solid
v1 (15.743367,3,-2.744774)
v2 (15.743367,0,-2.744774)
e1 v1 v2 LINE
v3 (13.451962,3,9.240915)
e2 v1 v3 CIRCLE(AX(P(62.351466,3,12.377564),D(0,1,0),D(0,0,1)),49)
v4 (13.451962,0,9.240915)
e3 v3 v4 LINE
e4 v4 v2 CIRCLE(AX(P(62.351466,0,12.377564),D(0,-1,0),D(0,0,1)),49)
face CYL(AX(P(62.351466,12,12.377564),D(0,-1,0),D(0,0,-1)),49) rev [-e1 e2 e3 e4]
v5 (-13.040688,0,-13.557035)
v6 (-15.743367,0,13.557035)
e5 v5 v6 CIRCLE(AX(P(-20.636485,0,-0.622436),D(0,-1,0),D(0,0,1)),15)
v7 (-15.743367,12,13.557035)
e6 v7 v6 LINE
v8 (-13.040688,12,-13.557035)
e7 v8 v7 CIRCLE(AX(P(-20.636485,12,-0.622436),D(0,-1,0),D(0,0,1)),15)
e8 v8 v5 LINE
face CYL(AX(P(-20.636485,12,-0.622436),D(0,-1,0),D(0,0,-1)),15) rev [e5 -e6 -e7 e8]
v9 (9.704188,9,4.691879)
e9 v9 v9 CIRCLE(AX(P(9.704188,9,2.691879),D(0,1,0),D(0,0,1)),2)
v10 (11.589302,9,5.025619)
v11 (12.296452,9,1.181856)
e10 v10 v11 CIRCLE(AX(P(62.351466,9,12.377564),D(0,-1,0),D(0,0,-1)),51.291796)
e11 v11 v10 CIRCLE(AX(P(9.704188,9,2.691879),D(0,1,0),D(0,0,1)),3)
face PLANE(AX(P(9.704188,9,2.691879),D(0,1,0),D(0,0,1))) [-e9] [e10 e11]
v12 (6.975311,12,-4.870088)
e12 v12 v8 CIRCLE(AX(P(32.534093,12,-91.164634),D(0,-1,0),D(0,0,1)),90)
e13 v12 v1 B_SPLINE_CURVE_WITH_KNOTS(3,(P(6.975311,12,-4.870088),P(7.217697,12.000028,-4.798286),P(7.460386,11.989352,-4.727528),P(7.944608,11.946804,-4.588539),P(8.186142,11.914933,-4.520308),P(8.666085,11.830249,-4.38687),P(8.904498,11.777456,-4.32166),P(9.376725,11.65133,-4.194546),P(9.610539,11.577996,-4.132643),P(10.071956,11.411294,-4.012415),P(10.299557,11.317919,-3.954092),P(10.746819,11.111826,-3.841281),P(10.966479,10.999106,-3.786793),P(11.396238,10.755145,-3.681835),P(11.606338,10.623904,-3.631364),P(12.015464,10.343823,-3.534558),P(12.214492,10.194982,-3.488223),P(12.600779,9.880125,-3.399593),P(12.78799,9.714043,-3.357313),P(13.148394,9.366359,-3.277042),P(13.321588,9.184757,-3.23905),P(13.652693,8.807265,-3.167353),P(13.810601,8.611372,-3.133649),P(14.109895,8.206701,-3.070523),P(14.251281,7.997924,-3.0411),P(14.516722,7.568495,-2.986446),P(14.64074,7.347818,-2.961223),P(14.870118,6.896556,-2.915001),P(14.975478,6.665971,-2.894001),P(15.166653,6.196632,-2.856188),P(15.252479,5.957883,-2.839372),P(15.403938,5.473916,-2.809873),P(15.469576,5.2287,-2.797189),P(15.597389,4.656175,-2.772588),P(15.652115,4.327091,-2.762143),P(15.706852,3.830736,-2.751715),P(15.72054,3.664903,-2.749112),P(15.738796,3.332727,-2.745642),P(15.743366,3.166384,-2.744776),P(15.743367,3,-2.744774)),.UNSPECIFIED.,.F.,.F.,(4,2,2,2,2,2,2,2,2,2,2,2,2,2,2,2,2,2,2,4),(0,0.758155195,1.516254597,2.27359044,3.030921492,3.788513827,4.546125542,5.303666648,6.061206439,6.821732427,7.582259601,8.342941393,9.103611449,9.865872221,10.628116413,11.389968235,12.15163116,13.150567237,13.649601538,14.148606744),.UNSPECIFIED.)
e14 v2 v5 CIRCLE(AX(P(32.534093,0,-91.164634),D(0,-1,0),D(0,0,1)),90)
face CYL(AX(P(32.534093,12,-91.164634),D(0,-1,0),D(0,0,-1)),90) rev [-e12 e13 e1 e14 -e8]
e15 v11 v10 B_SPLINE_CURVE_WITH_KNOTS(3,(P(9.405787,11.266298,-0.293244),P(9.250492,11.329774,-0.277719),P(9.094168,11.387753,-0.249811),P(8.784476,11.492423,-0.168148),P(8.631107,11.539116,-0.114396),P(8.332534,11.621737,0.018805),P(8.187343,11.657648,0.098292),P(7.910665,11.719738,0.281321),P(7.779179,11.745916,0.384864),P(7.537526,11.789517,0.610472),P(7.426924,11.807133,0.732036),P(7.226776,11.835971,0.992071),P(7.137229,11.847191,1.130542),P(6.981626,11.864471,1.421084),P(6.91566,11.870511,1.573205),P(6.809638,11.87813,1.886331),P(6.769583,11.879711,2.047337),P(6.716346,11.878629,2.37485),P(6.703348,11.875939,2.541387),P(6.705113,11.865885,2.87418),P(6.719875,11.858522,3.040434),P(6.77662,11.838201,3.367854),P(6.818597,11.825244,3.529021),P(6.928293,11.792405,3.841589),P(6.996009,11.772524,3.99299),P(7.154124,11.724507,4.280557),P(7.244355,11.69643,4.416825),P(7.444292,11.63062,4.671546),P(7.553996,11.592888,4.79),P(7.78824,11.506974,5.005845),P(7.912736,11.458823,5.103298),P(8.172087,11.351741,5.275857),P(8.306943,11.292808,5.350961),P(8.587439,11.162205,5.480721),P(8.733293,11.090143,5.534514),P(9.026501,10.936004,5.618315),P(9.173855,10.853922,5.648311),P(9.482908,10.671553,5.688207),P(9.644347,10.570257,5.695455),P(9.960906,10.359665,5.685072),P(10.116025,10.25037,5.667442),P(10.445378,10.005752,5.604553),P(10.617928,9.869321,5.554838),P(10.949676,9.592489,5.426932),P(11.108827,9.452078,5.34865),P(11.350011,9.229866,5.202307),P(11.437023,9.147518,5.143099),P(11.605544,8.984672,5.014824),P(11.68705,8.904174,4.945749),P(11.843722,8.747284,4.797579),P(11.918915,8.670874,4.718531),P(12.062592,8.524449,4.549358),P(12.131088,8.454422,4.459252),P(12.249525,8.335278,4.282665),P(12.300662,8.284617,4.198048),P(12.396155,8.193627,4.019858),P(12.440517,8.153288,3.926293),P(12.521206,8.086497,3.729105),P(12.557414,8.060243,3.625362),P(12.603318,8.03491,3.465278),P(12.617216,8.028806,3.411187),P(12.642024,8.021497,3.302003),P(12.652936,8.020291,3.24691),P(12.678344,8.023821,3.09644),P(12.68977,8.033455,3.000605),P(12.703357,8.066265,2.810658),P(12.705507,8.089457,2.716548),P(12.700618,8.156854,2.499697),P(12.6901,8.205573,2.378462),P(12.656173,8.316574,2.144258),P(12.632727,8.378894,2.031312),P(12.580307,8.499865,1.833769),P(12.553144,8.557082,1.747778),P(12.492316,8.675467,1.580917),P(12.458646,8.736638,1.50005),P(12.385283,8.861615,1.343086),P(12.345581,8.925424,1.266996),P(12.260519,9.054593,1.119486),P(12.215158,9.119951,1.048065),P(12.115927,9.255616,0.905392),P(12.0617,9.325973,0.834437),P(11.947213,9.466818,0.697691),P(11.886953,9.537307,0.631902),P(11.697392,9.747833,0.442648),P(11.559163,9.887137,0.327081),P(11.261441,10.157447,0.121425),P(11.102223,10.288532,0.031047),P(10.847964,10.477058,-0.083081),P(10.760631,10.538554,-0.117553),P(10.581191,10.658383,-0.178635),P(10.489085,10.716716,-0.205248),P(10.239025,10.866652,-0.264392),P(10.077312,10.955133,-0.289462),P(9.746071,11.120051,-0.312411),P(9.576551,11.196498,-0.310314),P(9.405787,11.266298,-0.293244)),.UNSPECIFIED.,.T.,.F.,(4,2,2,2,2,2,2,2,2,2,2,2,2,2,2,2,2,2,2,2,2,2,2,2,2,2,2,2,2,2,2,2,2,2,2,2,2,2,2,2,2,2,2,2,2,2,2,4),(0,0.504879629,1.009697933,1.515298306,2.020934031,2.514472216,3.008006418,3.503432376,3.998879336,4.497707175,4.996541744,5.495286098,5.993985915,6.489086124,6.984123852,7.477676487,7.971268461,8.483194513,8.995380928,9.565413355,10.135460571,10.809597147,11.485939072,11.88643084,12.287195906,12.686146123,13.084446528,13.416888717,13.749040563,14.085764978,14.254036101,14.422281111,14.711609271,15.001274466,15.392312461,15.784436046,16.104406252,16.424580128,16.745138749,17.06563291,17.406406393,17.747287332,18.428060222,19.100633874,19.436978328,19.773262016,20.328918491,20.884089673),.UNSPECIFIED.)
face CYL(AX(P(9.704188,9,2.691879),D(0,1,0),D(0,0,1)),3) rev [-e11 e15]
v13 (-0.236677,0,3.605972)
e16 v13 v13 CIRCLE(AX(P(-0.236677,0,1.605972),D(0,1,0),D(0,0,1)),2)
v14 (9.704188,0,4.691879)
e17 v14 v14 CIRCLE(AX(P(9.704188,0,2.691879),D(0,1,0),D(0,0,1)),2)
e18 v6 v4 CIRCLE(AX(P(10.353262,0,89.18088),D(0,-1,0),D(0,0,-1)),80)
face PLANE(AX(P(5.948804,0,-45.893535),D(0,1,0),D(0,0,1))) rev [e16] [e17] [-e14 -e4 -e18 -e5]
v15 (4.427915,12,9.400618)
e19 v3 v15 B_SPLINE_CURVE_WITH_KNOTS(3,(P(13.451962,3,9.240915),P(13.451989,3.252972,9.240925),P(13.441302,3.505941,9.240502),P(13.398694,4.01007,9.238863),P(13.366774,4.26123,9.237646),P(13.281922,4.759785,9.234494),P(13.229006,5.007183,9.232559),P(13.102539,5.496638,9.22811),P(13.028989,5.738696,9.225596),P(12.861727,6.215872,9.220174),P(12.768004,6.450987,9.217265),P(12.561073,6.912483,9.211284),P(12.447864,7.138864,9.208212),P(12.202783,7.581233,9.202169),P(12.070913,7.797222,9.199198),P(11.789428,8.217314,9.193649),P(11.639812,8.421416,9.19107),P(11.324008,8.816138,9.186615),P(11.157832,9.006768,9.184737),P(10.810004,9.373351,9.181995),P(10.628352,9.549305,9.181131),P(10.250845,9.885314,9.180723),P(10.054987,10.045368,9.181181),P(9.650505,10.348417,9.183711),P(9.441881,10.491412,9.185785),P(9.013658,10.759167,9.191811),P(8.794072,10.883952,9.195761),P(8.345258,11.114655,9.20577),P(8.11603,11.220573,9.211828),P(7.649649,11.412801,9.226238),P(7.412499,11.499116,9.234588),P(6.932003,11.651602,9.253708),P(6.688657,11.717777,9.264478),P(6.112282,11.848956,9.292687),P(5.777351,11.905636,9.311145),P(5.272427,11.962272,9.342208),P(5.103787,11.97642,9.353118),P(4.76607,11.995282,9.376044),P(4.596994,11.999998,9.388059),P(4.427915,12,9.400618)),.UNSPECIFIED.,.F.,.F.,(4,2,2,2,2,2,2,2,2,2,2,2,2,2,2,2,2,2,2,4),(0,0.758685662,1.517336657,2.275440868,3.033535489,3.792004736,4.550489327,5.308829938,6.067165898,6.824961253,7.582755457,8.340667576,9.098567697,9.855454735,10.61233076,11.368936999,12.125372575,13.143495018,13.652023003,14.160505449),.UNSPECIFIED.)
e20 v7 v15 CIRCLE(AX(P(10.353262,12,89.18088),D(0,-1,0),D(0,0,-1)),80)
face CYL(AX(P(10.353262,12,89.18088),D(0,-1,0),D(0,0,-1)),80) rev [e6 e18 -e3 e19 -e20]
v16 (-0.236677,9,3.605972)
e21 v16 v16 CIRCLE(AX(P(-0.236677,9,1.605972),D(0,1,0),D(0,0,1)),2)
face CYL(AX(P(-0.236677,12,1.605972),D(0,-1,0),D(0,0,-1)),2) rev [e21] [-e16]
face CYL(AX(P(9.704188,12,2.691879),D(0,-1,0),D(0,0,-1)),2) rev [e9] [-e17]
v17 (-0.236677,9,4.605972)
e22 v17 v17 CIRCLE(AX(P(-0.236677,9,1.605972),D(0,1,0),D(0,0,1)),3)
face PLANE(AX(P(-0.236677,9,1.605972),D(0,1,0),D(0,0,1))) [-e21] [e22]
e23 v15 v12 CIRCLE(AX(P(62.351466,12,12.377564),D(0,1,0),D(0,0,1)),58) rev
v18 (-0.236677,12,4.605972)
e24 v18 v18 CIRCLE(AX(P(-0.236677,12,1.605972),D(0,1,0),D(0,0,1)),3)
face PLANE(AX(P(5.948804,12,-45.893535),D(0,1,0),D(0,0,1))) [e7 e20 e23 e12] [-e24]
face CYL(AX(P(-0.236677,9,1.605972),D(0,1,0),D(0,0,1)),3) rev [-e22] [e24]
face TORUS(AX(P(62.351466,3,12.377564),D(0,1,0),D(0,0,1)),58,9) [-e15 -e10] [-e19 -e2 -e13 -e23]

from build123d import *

# Parameters (mm, degrees)
SKETCH4_R           = 2
BOSS_EXTRUDE3_DEPTH = 12
SKETCH5_R           = 3
CUT_EXTRUDE1_DEPTH  = 3
FILLET2_R           = 9


with BuildPart() as part:
    # Sketch4 → Boss-Extrude3 (new body)
    with BuildSketch(Plane(origin=(0, 0, 0), x_dir=(1, 0, 0), z_dir=(0, 1, 0))):
        with BuildLine():
            ThreePointArc((-15.743367066, -13.557035328), (-1.346456096, -10.041025711), (13.451962467, -9.240914984))
            ThreePointArc((13.451962467, -9.240914984), (14.223098903, -3.176461435), (15.743367066, 2.744774328))
            ThreePointArc((15.743367066, 2.744774328), (0.886180468, 6.912573541), (-13.040688221, 13.557035328))
            ThreePointArc((-13.040688221, 13.557035328), (-5.710452271, -0.865362874), (-15.743367066, -13.557035328))
        make_face()
        with Locations(Location((-0.236677372, -1.605971843, 0), (0, 0, 270))):
            Circle(SKETCH4_R, mode=Mode.SUBTRACT)
        with Locations(Location((9.704188058, -2.691879069, 0), (0, 0, 270))):
            Circle(SKETCH4_R, mode=Mode.SUBTRACT)
    extrude(amount=BOSS_EXTRUDE3_DEPTH)

    # Sketch5 → Cut-Extrude1 (cut)
    with BuildSketch(Plane(origin=(0, 12, 0), x_dir=(1, 0, 0), z_dir=(0, 1, 0))):
        with Locations(Location((-0.236677372, -1.605971843, 0), (0, 0, 270))):
            Circle(SKETCH5_R)
        with Locations(Location((9.704188058, -2.691879069, 0), (0, 0, 270))):
            Circle(SKETCH5_R)
    extrude(amount=-CUT_EXTRUDE1_DEPTH, mode=Mode.SUBTRACT)

    # Fillet2
    # the kernel refuses this fillet: 9 mm, written as the material it takes off along each edge
    with BuildSketch(Plane(origin=(62.351465844, 12, 12.377564393), x_dir=(-0.9229460384493624, 0, 0.38492935729900885), z_dir=(0.38492935729900885, 0, 0.9229460384493624))) as fillet2_piece_1:
        with BuildLine():
            CenterArc((49 + FILLET2_R, FILLET2_R), FILLET2_R, 180, 90)
            Line((49 + FILLET2_R, 0), (49, 0))
            Line((49, 0), (49, FILLET2_R))
        make_face()
    revolve(axis=Axis((62.351465844, 12, 12.377564393), (0, -1, 0)), revolution_arc=66.924942426, mode=Mode.SUBTRACT)


solid = part.part
